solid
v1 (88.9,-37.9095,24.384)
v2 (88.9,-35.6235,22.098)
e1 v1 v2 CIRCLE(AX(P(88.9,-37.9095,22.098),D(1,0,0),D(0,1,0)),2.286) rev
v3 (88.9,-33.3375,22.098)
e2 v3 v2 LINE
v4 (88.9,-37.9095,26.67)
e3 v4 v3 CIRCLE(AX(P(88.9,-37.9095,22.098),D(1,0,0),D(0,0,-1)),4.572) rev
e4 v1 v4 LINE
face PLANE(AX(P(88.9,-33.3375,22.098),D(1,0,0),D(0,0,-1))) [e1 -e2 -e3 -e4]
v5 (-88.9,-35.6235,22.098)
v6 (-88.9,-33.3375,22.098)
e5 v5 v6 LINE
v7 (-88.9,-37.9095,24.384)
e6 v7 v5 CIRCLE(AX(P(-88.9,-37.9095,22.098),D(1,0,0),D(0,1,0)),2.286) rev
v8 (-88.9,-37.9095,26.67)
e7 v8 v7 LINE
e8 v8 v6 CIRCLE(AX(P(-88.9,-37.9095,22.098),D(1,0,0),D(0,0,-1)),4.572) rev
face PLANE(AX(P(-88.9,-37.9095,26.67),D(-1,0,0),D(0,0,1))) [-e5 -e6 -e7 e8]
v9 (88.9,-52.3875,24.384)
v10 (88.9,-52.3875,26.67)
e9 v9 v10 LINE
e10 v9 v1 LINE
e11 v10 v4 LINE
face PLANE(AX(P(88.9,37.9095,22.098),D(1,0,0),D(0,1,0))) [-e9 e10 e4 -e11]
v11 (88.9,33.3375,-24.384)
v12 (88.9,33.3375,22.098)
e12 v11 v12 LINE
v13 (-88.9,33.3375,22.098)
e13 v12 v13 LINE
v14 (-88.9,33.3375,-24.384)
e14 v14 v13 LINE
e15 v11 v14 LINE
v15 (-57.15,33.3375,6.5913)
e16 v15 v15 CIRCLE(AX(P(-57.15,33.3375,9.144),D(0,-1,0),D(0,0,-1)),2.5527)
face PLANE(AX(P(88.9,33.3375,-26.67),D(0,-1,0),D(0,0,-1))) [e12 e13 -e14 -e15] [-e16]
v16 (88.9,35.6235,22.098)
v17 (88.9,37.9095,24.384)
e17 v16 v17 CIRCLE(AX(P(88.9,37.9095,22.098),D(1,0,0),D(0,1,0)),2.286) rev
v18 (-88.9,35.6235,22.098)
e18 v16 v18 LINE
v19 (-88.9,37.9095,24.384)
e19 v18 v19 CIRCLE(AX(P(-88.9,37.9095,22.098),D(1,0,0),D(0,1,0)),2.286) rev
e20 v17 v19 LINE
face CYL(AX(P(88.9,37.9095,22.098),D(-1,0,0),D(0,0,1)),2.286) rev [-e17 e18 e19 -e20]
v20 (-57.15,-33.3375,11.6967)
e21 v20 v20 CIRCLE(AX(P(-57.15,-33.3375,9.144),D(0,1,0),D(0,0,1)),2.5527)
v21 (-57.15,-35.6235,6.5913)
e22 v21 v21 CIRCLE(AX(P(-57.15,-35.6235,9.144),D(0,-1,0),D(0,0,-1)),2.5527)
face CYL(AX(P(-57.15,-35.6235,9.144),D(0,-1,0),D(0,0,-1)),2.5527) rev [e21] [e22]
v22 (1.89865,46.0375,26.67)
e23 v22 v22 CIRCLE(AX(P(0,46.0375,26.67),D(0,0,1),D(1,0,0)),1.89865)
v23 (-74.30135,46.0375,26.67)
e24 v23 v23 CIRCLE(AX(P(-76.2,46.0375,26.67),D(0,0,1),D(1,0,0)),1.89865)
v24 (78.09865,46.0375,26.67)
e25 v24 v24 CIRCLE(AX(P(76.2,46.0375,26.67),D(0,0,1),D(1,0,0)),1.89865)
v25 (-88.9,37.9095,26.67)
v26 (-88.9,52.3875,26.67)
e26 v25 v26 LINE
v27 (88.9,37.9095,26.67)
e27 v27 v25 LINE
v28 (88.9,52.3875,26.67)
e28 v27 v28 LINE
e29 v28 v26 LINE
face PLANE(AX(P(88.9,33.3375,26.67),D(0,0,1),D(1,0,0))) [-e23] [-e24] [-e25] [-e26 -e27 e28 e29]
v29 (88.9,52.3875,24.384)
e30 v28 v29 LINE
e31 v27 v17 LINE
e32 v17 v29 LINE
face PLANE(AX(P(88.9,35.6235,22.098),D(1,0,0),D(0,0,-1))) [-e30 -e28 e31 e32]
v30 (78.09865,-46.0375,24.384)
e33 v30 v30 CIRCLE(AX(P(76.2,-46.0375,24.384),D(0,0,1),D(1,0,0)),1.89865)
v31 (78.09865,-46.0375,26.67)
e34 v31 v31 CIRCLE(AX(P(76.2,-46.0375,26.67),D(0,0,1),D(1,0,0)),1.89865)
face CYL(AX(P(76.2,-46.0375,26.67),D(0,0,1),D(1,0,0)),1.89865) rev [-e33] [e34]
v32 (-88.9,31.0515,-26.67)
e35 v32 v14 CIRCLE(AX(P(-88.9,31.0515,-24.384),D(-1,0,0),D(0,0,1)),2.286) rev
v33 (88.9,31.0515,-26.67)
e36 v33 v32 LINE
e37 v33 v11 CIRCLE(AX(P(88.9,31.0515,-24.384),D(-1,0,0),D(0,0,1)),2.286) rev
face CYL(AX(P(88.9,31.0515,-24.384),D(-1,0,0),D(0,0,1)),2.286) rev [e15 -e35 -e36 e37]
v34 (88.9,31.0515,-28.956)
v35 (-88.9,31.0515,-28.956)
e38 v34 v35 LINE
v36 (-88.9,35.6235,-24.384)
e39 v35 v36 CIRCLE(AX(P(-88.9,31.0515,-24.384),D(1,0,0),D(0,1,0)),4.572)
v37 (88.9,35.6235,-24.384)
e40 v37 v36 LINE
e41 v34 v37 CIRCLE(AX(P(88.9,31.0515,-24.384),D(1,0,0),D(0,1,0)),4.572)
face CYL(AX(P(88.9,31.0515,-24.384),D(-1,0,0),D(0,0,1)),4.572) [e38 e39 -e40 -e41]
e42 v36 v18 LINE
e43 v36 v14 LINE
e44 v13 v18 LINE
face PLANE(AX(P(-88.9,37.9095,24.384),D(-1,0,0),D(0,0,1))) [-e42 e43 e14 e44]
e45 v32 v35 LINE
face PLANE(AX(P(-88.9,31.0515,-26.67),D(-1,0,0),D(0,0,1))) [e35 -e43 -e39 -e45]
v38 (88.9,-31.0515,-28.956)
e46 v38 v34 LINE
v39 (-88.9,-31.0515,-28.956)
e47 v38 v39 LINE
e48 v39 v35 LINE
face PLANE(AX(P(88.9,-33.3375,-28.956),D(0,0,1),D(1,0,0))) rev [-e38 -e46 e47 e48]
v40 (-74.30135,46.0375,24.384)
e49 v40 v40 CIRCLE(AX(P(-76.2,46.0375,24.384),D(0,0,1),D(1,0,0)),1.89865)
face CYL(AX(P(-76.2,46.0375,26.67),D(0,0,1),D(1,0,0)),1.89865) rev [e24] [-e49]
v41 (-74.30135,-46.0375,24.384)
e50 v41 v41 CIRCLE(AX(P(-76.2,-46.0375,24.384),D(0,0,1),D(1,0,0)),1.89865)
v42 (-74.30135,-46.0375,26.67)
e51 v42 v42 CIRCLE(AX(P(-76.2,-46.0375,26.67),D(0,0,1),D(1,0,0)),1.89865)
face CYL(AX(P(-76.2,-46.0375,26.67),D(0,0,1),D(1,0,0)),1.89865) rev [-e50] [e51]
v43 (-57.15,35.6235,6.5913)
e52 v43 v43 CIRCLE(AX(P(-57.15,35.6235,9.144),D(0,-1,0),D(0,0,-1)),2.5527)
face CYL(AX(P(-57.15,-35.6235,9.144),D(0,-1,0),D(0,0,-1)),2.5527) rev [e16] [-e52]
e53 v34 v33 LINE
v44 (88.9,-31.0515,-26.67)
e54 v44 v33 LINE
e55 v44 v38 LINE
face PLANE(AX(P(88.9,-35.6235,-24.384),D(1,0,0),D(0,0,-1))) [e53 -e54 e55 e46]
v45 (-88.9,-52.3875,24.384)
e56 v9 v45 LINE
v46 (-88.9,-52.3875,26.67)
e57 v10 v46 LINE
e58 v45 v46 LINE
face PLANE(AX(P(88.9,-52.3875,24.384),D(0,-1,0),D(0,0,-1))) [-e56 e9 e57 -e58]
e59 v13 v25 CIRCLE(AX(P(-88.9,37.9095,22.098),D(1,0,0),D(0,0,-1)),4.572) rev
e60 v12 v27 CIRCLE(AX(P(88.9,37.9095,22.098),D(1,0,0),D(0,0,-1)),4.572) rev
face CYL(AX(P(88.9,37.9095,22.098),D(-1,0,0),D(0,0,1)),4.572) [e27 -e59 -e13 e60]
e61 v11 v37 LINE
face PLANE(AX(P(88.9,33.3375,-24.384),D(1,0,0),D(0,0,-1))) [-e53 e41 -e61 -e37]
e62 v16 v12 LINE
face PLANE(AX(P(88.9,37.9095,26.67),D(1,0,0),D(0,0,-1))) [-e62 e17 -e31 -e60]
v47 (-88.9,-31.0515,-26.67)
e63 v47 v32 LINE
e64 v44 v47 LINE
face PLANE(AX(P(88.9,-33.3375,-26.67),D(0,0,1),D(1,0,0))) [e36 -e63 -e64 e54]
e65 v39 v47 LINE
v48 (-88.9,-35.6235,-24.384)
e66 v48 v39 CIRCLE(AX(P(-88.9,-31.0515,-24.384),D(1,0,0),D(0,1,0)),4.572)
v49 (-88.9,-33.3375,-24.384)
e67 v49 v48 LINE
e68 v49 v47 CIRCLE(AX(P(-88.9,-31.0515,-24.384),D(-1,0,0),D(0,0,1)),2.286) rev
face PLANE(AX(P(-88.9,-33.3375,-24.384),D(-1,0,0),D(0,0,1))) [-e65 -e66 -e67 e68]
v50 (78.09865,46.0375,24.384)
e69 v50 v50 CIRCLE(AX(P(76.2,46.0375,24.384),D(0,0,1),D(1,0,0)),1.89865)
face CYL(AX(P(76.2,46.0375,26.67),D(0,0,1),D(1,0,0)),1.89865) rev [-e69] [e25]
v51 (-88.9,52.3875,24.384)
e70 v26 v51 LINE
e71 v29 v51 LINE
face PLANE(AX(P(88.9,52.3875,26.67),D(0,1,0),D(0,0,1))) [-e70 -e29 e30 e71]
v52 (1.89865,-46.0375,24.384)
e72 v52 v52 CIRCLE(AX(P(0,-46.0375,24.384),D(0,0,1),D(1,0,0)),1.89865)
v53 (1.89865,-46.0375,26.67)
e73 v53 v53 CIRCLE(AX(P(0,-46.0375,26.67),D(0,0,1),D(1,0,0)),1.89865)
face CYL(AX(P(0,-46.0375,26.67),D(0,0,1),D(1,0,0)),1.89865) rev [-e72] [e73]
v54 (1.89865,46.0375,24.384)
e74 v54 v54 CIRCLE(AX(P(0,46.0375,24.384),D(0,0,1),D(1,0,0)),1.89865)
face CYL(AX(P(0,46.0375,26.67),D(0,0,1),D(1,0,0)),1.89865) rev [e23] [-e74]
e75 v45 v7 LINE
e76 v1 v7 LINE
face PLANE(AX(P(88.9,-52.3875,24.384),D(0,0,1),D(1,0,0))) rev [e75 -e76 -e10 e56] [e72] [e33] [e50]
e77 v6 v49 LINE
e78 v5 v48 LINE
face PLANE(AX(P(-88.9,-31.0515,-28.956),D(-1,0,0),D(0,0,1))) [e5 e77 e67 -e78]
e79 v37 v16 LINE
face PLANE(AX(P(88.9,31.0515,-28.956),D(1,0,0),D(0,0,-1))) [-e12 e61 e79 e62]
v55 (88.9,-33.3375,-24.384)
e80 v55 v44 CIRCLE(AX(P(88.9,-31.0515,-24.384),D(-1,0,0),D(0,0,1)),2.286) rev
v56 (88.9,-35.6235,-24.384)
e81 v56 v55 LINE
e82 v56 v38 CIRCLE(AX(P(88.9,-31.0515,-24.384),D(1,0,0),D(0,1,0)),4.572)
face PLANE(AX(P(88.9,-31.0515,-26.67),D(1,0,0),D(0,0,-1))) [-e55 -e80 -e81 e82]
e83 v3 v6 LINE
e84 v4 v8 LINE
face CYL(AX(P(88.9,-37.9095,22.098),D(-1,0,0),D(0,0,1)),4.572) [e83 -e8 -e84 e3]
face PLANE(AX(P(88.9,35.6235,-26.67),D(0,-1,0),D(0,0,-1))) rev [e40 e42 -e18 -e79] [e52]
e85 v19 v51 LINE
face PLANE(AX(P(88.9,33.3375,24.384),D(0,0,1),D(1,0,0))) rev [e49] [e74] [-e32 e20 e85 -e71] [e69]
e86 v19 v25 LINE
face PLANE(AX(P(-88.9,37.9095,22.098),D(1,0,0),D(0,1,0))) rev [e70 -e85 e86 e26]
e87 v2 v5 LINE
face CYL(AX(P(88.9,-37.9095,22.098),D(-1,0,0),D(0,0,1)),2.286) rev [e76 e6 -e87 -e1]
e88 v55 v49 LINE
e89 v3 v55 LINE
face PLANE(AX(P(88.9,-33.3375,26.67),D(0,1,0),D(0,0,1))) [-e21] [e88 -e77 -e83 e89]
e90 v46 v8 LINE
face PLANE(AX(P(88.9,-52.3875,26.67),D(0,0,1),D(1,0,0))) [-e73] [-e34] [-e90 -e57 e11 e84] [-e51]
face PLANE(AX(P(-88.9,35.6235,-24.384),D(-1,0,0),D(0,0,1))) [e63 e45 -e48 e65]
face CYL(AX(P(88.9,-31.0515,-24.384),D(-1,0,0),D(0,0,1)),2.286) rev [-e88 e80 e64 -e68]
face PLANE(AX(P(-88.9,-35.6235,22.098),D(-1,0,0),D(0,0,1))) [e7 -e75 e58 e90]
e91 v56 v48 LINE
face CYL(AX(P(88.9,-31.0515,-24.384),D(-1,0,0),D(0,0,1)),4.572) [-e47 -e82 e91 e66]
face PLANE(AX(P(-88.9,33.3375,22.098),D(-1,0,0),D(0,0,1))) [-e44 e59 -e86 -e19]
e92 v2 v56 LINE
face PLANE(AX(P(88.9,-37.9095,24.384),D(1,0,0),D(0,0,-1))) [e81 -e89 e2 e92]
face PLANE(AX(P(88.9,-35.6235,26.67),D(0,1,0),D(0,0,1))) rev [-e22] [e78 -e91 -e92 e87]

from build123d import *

# Parameters (mm, degrees)
BASE_FLANGE1_DEPTH           = 88.9
F_25_0_1495_DIAMETER_HOLE1_D = 3.7973
F_7_0_201_DIAMETER_HOLE1_D   = 5.1054


# Sheet-metal steps are written as plain solids
with BuildPart() as part:
    # Sketch1 → Base-Flange1 (new, symmetric)
    with BuildSketch(Plane.YZ):
        with BuildLine():
            Line((-52.3875, 26.67), (-37.9095, 26.67))
            ThreePointArc((-37.9095, 26.67), (-34.676607796, 25.330892204), (-33.3375, 22.098))
            Line((-33.3375, 22.098), (-33.3375, -24.384))
            ThreePointArc((-33.3375, -24.384), (-32.667946102, -26.000446102), (-31.0515, -26.67))
            Line((-31.0515, -26.67), (31.0515, -26.67))
            ThreePointArc((31.0515, -26.67), (32.667946102, -26.000446102), (33.3375, -24.384))
            Line((33.3375, -24.384), (33.3375, 22.098))
            ThreePointArc((33.3375, 22.098), (34.676607796, 25.330892204), (37.9095, 26.67))
            Line((37.9095, 26.67), (52.3875, 26.67))
            Line((52.3875, 26.67), (52.3875, 24.384))
            Line((52.3875, 24.384), (37.9095, 24.384))
            ThreePointArc((37.9095, 24.384), (36.293053898, 23.714446102), (35.6235, 22.098))
            Line((35.6235, 22.098), (35.6235, -24.384))
            ThreePointArc((35.6235, -24.384), (34.284392204, -27.616892204), (31.0515, -28.956))
            Line((31.0515, -28.956), (-31.0515, -28.956))
            ThreePointArc((-31.0515, -28.956), (-34.284392204, -27.616892204), (-35.6235, -24.384))
            Line((-35.6235, -24.384), (-35.6235, 22.098))
            ThreePointArc((-35.6235, 22.098), (-36.293053898, 23.714446102), (-37.9095, 24.384))
            Line((-37.9095, 24.384), (-52.3875, 24.384))
            Line((-52.3875, 24.384), (-52.3875, 26.67))
        make_face()
    extrude(amount=BASE_FLANGE1_DEPTH, both=True)

    # #25 (0.1495) Diameter Hole1 (through all)
    with Locations(Plane.XY.offset(26.67)):
        with Locations((-76.2, 46.0375), (0, 46.0375), (76.2, 46.0375), (76.2, -46.0375), (0, -46.0375), (-76.2, -46.0375)):
            Hole(F_25_0_1495_DIAMETER_HOLE1_D / 2)

    # #7 (0.201) Diameter Hole1 (through all)
    with Locations(Plane.XZ.offset(35.6235)):
        with Locations((-57.15, 9.144)):
            Hole(F_7_0_201_DIAMETER_HOLE1_D / 2)


solid = part.part
